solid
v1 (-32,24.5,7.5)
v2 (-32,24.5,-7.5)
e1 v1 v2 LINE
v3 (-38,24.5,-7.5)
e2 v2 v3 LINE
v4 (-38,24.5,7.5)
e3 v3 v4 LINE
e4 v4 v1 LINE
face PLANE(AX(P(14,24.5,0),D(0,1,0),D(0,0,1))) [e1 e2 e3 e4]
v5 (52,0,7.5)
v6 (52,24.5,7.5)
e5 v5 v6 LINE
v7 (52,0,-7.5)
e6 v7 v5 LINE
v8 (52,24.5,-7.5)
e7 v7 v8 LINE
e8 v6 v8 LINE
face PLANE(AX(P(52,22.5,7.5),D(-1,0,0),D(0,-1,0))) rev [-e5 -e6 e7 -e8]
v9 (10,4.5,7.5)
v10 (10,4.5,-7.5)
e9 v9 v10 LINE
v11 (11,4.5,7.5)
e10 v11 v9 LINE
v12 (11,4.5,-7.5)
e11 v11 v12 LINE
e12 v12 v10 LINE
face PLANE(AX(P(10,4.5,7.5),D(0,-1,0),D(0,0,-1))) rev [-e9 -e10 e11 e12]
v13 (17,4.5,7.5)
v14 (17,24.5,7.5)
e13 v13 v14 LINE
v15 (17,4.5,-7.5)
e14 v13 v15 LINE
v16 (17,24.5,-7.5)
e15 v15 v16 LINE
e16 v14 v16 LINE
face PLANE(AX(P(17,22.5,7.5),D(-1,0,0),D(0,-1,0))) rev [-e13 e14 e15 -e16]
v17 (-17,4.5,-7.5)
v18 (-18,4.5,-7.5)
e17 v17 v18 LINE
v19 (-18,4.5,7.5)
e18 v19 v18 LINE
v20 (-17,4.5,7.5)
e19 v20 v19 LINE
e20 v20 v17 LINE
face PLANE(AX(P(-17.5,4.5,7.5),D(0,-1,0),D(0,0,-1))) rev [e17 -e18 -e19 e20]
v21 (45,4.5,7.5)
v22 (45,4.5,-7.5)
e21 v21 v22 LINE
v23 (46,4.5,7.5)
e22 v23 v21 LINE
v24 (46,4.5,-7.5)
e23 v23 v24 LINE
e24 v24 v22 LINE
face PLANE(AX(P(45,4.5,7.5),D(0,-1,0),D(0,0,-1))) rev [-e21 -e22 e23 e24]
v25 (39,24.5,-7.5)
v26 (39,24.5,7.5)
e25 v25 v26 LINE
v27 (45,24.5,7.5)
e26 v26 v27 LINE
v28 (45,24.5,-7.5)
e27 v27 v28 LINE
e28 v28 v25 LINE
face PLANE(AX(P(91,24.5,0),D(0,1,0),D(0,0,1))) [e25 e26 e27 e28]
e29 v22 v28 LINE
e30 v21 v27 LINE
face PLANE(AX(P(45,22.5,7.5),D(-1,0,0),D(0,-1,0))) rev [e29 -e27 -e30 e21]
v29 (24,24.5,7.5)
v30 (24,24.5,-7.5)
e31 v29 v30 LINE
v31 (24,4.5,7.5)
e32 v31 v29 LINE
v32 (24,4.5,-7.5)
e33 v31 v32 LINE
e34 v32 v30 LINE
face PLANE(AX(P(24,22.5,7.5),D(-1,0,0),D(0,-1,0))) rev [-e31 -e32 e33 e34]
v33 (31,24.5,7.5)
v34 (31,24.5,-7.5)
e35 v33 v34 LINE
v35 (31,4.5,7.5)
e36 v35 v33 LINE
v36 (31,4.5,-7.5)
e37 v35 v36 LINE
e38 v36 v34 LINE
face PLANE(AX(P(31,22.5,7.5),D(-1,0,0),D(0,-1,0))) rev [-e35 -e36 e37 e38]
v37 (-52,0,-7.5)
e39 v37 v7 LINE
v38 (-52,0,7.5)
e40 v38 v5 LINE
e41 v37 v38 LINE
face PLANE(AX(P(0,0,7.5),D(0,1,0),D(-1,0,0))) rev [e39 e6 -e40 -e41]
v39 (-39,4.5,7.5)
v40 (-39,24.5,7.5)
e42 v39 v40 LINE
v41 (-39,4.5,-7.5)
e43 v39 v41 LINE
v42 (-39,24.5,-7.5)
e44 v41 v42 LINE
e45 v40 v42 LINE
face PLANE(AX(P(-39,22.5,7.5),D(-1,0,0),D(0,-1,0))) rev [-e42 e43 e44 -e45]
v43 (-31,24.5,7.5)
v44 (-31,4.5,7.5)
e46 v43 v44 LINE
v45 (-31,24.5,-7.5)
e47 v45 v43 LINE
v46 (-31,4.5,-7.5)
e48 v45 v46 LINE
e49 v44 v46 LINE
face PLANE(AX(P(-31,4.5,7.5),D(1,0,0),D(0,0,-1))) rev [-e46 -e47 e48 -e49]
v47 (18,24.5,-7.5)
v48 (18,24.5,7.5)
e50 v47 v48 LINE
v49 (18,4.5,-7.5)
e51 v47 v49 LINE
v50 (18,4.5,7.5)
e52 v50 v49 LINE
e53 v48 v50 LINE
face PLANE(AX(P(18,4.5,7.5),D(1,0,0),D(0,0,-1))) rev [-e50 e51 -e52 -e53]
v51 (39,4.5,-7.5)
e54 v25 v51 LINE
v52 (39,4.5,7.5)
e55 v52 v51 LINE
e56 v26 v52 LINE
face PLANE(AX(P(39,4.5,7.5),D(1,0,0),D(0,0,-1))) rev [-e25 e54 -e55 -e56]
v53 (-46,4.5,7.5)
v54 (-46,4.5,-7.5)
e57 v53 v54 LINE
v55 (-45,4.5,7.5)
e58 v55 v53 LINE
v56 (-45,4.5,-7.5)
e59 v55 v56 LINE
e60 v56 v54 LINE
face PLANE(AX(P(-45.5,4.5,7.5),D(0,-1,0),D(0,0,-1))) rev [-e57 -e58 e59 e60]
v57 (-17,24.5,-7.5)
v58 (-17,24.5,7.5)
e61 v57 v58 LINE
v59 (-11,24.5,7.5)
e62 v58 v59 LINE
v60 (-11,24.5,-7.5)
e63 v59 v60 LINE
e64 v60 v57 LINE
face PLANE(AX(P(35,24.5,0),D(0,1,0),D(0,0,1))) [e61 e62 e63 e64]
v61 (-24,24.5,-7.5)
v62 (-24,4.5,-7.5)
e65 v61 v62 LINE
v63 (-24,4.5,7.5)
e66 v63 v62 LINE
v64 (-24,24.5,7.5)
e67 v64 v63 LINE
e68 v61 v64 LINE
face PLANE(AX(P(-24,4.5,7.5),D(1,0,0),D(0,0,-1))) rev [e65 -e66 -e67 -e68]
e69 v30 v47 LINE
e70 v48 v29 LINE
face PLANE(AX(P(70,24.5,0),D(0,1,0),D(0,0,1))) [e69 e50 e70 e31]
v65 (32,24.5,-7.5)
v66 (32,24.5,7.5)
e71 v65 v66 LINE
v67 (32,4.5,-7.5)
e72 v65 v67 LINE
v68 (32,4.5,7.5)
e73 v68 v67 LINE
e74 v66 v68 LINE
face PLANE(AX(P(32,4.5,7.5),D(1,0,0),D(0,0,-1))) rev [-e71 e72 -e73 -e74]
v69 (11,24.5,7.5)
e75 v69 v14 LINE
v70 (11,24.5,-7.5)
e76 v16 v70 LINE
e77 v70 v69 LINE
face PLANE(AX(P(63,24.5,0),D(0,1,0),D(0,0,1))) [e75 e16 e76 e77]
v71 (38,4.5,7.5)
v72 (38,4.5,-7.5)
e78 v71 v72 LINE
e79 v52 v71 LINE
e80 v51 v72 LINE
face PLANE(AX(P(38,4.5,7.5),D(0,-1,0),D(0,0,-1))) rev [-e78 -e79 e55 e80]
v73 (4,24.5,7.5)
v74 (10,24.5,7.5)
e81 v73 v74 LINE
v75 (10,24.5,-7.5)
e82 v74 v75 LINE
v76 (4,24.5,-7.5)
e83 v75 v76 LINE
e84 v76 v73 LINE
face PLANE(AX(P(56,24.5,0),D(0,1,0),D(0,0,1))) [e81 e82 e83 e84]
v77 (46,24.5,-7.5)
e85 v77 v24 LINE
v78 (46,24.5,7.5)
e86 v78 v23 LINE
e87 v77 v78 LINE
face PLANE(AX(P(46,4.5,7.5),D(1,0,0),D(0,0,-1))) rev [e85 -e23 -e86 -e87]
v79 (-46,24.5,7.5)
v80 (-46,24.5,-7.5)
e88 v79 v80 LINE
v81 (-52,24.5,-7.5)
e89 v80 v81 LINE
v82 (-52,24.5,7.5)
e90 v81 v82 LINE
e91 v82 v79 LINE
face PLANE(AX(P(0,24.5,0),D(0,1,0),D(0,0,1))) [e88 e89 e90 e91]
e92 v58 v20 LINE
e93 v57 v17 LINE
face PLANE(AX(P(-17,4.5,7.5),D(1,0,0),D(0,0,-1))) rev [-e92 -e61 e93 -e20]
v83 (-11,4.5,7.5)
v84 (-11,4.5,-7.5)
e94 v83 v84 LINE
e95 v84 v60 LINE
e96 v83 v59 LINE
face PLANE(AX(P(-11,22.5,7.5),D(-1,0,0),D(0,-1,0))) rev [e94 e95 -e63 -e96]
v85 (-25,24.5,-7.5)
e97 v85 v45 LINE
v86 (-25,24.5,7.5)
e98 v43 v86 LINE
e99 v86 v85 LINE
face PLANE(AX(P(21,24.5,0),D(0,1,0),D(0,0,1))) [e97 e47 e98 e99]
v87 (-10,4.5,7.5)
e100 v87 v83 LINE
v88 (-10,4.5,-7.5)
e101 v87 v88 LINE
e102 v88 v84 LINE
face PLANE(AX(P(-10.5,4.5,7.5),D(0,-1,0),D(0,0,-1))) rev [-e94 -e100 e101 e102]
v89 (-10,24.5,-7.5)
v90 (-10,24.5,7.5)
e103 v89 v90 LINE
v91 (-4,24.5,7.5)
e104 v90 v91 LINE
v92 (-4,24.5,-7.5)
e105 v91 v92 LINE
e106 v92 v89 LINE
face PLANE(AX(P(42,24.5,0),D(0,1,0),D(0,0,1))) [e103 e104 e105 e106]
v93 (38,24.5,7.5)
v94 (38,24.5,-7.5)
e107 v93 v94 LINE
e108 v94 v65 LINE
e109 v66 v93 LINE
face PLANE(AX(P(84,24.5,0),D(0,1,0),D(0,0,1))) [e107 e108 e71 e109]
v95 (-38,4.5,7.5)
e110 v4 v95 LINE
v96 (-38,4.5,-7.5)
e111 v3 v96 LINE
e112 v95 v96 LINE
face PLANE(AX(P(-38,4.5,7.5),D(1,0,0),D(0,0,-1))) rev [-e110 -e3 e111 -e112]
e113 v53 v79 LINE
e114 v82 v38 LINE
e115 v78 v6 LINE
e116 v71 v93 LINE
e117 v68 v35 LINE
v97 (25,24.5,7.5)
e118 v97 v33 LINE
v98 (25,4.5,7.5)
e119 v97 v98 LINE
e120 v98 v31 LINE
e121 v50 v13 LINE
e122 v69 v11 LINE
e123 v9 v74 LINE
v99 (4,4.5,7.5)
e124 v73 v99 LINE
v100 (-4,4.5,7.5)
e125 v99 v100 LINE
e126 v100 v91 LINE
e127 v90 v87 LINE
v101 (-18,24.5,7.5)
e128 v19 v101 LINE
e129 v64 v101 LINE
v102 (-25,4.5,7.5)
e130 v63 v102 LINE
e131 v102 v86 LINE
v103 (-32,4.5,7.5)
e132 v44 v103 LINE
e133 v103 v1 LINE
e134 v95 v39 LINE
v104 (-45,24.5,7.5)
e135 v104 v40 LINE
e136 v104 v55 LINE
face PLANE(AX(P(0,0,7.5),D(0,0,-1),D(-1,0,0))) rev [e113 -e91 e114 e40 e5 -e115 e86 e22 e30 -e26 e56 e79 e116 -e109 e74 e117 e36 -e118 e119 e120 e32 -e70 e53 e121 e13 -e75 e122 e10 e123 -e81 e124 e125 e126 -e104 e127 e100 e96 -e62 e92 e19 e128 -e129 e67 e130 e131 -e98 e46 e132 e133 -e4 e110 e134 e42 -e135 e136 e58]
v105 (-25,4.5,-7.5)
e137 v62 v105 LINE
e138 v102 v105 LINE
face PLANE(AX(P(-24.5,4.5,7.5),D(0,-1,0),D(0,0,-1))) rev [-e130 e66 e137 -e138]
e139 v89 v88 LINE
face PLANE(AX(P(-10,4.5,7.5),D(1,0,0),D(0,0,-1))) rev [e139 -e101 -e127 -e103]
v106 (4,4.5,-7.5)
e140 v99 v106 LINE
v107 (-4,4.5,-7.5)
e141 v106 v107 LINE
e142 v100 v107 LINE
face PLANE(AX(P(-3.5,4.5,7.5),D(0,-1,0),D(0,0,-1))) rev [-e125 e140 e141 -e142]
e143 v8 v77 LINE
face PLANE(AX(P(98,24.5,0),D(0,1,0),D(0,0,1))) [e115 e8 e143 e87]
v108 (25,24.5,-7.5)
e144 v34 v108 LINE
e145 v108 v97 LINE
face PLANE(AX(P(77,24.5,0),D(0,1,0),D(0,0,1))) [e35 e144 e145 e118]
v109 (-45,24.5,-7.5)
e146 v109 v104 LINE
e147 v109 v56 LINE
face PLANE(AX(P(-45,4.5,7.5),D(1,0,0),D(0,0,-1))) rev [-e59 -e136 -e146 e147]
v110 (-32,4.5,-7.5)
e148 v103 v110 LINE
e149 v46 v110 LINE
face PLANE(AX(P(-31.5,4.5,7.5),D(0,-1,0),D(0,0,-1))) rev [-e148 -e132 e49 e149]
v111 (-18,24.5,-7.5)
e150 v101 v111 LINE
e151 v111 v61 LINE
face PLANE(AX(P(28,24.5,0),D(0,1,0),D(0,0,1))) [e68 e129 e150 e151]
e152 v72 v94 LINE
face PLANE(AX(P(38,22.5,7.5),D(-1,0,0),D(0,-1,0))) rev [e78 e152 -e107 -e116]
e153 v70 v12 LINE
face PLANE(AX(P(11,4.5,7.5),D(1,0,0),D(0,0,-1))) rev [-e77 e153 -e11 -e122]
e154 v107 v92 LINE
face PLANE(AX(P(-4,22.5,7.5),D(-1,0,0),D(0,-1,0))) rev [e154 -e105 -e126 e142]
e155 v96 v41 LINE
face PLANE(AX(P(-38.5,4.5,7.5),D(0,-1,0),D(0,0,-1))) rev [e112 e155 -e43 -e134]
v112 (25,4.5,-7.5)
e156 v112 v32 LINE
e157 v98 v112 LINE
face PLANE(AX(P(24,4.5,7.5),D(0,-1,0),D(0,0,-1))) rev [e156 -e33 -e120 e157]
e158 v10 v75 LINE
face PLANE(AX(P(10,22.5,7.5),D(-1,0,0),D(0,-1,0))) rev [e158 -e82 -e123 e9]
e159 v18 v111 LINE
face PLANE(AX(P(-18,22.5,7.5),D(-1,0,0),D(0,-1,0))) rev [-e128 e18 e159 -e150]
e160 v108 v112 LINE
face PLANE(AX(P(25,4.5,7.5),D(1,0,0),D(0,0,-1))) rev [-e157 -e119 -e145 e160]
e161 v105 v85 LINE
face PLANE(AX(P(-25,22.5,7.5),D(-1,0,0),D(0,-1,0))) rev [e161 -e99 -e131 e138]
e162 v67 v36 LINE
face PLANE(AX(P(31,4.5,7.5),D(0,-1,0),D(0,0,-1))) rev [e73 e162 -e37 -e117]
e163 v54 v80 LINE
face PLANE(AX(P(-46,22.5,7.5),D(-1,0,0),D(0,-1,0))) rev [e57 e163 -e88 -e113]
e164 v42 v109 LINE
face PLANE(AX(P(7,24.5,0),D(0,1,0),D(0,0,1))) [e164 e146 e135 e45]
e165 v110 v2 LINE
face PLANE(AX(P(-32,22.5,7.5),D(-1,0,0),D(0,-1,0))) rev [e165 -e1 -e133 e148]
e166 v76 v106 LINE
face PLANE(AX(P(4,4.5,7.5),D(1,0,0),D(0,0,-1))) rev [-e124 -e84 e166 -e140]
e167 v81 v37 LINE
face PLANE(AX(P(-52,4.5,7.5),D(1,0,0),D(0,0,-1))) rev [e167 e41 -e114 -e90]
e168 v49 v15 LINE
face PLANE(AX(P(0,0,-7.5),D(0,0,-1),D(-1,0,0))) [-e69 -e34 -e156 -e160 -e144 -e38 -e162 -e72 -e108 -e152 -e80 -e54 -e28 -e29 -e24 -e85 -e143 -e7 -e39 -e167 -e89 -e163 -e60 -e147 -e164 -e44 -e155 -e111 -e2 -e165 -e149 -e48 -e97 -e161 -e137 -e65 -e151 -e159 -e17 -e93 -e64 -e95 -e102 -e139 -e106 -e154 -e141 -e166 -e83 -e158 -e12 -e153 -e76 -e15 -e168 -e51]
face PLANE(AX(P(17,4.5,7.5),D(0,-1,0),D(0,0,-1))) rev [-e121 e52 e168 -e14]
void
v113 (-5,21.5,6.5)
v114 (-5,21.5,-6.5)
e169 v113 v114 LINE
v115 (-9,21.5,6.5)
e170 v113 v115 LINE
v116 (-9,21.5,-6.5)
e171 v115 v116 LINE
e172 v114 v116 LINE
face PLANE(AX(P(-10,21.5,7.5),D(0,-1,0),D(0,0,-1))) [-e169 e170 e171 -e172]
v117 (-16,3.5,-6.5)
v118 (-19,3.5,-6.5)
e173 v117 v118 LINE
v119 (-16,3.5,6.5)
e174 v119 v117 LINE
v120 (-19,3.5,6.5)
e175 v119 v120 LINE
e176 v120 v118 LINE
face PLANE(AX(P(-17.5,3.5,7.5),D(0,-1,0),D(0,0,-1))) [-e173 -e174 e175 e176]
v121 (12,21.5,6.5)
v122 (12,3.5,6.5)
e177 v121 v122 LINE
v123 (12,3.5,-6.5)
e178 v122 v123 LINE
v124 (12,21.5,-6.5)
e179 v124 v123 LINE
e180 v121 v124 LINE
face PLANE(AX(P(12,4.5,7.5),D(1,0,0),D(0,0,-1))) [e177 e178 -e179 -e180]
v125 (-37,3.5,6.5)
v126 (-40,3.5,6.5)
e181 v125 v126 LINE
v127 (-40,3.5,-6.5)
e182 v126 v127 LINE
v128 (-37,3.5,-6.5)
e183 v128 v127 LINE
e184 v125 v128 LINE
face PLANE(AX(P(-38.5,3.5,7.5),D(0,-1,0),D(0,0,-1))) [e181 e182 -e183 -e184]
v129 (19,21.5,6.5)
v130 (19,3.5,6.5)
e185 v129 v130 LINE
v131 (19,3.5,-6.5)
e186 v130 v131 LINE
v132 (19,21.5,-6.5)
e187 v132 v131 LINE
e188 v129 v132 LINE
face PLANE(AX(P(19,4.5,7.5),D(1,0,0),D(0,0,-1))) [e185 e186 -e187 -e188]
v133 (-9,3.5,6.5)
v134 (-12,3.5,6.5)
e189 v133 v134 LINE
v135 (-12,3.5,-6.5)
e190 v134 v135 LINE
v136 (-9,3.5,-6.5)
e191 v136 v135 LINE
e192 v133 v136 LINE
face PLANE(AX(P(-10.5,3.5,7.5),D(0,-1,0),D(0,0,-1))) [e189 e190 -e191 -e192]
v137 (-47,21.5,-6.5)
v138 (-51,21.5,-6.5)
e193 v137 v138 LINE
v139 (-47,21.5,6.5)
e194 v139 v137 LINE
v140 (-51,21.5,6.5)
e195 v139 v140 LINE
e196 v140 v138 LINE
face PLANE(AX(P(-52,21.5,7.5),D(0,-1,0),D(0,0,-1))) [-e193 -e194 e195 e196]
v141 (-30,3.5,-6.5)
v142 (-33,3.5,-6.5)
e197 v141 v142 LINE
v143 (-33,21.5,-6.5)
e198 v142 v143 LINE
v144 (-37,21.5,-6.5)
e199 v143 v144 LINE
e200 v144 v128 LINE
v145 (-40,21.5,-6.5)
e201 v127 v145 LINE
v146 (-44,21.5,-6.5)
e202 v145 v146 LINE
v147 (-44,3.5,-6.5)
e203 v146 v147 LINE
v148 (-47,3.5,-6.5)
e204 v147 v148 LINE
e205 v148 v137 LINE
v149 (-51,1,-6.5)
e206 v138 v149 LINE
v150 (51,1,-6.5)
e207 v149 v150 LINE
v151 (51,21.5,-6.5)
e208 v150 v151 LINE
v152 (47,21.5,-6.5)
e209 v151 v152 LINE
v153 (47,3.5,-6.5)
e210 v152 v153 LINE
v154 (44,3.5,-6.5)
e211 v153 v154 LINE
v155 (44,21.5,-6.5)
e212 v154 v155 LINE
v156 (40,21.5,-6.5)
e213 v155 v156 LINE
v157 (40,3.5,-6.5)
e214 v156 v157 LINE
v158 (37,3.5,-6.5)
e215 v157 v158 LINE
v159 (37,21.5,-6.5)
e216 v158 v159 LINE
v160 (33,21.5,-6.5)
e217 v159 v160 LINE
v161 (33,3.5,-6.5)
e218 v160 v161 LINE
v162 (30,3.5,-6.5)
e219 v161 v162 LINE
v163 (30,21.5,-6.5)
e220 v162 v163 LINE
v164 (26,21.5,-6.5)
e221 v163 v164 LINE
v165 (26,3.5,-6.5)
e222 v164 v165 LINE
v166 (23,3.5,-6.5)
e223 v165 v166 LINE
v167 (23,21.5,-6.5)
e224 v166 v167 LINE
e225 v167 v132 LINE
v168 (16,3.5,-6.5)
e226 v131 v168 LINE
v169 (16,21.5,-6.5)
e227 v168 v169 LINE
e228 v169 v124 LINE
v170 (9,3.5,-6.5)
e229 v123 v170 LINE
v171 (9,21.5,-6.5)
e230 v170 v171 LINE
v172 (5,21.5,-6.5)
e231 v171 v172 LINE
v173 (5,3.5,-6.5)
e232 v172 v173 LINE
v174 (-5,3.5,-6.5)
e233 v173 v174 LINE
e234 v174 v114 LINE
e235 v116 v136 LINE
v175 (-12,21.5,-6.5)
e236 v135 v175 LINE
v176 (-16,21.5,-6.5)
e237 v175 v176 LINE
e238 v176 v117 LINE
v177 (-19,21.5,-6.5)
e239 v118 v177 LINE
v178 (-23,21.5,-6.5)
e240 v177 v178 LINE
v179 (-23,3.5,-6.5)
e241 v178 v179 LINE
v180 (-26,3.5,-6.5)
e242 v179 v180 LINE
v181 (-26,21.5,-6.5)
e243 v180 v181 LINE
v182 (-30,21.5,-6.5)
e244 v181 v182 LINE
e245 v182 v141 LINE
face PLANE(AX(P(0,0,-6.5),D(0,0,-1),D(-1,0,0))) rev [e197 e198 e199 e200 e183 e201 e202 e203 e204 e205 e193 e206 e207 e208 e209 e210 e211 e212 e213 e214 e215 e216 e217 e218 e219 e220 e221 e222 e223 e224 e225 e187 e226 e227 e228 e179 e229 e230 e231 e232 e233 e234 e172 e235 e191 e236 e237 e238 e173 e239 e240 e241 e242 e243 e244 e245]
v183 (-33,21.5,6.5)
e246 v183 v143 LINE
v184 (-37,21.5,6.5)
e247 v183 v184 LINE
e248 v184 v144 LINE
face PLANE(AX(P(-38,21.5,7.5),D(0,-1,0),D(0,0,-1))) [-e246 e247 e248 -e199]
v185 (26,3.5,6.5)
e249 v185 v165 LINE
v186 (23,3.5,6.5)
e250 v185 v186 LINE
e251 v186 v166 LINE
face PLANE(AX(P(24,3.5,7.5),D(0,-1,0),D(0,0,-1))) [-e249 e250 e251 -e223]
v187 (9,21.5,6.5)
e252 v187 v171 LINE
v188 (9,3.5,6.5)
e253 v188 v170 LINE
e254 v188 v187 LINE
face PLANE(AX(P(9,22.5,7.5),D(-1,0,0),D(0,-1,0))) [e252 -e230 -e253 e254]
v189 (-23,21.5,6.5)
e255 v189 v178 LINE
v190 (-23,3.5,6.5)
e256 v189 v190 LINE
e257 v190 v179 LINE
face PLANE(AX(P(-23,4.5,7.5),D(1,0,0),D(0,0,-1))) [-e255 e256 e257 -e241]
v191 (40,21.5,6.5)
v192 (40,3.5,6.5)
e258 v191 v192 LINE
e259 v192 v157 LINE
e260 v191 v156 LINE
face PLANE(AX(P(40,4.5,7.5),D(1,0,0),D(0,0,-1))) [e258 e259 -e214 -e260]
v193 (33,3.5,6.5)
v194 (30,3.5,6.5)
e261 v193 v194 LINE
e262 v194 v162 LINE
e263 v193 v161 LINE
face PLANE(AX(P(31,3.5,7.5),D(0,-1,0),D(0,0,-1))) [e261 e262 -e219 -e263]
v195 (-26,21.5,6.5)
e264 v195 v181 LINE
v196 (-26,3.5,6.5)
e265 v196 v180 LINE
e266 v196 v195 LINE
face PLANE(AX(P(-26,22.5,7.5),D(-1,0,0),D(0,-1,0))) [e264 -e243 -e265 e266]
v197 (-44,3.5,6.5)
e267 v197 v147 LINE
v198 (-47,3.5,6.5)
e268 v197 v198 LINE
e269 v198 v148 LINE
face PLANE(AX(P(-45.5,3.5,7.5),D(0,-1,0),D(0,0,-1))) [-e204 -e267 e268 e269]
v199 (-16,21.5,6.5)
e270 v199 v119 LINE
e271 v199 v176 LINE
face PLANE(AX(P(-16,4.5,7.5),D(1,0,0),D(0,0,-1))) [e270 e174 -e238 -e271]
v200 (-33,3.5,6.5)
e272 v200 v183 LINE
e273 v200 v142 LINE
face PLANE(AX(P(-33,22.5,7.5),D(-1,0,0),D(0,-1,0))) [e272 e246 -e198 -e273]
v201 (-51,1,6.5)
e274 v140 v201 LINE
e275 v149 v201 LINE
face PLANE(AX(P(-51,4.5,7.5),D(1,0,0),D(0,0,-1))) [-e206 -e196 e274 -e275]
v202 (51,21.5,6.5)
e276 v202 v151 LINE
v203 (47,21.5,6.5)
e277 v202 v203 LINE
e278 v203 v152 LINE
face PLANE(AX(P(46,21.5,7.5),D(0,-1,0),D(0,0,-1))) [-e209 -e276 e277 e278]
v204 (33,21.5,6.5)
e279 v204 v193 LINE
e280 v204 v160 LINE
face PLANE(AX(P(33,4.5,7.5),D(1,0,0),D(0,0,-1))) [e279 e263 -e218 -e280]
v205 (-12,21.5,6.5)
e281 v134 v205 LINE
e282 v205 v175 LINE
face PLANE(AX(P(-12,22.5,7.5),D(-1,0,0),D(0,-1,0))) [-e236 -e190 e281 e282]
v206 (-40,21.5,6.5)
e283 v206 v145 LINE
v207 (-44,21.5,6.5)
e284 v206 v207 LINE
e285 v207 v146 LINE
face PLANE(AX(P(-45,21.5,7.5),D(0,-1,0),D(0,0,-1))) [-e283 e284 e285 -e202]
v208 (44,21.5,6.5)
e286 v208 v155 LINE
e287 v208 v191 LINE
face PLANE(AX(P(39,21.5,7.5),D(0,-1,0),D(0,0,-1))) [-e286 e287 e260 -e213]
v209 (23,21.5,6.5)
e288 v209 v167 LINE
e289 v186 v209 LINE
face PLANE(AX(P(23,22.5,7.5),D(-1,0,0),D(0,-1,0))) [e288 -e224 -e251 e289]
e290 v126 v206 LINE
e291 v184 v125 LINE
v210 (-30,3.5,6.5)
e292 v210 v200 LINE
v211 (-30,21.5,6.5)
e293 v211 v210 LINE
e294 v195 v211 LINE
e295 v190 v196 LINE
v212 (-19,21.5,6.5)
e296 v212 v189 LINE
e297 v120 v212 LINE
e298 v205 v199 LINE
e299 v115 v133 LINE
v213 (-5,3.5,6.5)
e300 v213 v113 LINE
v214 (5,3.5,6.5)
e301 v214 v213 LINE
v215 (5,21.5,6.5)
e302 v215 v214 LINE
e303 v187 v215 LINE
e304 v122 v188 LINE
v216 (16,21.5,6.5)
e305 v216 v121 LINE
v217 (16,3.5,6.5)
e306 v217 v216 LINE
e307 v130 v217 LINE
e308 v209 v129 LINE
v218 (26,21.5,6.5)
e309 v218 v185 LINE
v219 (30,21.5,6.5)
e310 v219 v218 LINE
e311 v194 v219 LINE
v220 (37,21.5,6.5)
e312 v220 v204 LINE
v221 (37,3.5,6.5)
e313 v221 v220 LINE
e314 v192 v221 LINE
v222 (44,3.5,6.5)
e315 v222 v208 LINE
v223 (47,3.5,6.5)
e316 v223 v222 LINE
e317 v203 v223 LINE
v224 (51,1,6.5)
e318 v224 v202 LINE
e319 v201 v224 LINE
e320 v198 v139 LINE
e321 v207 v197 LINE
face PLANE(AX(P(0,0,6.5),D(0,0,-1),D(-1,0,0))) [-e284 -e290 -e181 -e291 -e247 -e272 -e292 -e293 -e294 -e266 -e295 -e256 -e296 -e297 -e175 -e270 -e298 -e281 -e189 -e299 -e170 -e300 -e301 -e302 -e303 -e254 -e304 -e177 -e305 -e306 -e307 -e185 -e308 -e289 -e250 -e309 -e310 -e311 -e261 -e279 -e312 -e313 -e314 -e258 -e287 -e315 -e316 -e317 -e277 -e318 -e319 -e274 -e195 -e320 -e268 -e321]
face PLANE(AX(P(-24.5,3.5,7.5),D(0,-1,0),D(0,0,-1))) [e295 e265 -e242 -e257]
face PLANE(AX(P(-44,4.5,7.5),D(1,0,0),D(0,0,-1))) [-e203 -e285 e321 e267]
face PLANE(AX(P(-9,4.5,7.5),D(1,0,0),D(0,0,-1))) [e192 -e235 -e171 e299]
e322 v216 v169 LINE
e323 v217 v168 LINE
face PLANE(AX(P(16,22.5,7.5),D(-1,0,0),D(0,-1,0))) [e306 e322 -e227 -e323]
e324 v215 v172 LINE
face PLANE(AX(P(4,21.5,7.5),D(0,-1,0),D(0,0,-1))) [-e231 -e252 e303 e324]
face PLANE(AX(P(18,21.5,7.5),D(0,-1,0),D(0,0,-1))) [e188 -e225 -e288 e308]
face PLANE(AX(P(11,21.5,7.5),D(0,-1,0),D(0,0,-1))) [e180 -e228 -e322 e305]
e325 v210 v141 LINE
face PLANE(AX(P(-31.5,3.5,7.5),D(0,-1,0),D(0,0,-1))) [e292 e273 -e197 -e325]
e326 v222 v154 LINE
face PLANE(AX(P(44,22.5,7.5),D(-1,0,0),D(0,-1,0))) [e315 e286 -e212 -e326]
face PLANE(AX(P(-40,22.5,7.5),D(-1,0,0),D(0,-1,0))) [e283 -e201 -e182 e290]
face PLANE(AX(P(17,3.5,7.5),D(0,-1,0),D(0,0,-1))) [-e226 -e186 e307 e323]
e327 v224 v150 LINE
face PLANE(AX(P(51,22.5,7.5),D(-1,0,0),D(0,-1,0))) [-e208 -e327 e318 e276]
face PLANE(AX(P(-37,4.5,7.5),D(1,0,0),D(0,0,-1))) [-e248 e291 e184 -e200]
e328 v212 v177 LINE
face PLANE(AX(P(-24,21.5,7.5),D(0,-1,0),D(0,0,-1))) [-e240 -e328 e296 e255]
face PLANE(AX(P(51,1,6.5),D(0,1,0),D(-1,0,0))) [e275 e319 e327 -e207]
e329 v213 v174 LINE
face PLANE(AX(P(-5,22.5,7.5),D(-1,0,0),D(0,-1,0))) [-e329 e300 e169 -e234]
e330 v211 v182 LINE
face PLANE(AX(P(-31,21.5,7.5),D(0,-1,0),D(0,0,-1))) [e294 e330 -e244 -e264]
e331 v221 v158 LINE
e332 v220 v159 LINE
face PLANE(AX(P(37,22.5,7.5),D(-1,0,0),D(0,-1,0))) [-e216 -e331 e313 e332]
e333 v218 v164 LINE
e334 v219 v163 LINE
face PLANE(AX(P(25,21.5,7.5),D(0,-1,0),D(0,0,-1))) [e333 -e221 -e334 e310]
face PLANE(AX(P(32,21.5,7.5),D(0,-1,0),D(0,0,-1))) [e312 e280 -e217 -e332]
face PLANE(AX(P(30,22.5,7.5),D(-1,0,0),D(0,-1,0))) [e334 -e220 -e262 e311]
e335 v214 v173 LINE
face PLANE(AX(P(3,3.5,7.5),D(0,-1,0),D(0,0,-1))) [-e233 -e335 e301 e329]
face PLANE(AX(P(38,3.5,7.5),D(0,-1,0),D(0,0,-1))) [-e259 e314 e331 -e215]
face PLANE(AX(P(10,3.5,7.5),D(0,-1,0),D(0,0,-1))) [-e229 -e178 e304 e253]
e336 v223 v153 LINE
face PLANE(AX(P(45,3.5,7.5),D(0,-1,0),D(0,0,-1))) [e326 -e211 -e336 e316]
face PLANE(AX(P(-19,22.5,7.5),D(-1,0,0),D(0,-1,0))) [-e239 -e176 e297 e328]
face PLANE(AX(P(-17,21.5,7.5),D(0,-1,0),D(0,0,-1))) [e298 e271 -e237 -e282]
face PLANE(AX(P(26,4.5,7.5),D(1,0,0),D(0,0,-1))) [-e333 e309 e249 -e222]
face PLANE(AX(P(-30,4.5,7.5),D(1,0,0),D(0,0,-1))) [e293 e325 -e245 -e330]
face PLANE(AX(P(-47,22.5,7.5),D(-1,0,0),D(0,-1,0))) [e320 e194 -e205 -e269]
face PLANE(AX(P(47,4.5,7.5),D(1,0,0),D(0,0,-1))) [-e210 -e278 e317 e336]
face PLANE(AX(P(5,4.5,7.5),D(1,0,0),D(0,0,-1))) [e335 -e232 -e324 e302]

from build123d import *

# Parameters (mm, degrees)
BOSS_EXTRUDE1_DEPTH     = 7.5
LPATTERN1_COUNT         = 8
LPATTERN1_PITCH         = 7
LPATTERN1_COL_COUNT     = 8
LPATTERN1_COL_PITCH     = 7
SHELL2_T                = -1
CUT_EXTRUDE2_DEPTH      = 15
CUT_EXTRUDE2_DEPTH_BACK = 58.608593109
SKETCH3_W               = 0.5
SKETCH3_H               = 4.5
SKETCH4_W               = 13
SKETCH4_H               = 2.5
BOSS_EXTRUDE2_DEPTH     = 1
SKETCH5_W               = 13
SKETCH5_H               = 2.5
BOSS_EXTRUDE3_DEPTH     = 1
SKETCH8_W               = 6
SKETCH8_H               = 15
BOSS_EXTRUDE5_DEPTH     = 2
LPATTERN2_COUNT         = 15
LPATTERN2_PITCH         = 7
SKETCH10_W              = 6
SKETCH10_H              = 15
CUT_EXTRUDE4_DEPTH      = 20
SKETCH11_W              = 13
SKETCH11_H              = 1
BOSS_EXTRUDE6_DEPTH     = 4


# Read off the part's stored shape, not the designer's step: Split1
with BuildPart() as part:
    # Sketch1 → Boss-Extrude1 (new, symmetric)
    with BuildSketch(Plane.XY):
        Polygon((0, 0), (-3.5, 0), (-3.5, 4.5), (-3, 4.5), (-3, 22.5), (3, 22.5), (3, 4.5), (3.5, 4.5), (3.5, 0), align=None)
    boss_extrude1 = extrude(amount=BOSS_EXTRUDE1_DEPTH, both=True)

    # LPattern1: Boss-Extrude1 ×8
    with Locations(*[(-i * LPATTERN1_PITCH, 0, 0) for i in range(1, LPATTERN1_COUNT)]):
        add(boss_extrude1)


with BuildPart() as lpattern1_col_1:
    # LPattern1 col: pattern copy
    add(boss_extrude1.moved(Location(Vector(1, 0, 0) * (1 * LPATTERN1_COL_PITCH))))


with BuildPart() as lpattern1_col_2:
    # LPattern1 col: pattern copy
    add(boss_extrude1.moved(Location(Vector(1, 0, 0) * (2 * LPATTERN1_COL_PITCH))))


with BuildPart() as lpattern1_col_3:
    # LPattern1 col: pattern copy
    add(boss_extrude1.moved(Location(Vector(1, 0, 0) * (3 * LPATTERN1_COL_PITCH))))


with BuildPart() as lpattern1_col_4:
    # LPattern1 col: pattern copy
    add(boss_extrude1.moved(Location(Vector(1, 0, 0) * (4 * LPATTERN1_COL_PITCH))))


with BuildPart() as lpattern1_col_5:
    # LPattern1 col: pattern copy
    add(boss_extrude1.moved(Location(Vector(1, 0, 0) * (5 * LPATTERN1_COL_PITCH))))


with BuildPart() as lpattern1_col_6:
    # LPattern1 col: pattern copy
    add(boss_extrude1.moved(Location(Vector(1, 0, 0) * (6 * LPATTERN1_COL_PITCH))))


with BuildPart() as lpattern1_col_7:
    # LPattern1 col: pattern copy
    add(boss_extrude1.moved(Location(Vector(1, 0, 0) * (7 * LPATTERN1_COL_PITCH))))


with BuildPart() as part_1:
    add(part.part)

    # LPattern1 col united with what the copie: union LPattern1 col_1, LPattern1 col_2, LPattern1 col_3, LPattern1 col_4, LPattern1 col_5, LPattern1 col_6, LPattern1 col_7
    add(lpattern1_col_1.part)
    add(lpattern1_col_2.part)
    add(lpattern1_col_3.part)
    add(lpattern1_col_4.part)
    add(lpattern1_col_5.part)
    add(lpattern1_col_6.part)
    add(lpattern1_col_7.part)

    # Shell2
    shell2_openings = [part_1.faces().sort_by_distance(p)[0] for p in [
        (52.5, 2.25, 0),
        (-52.5, 2.25, 0),
    ]]
    offset(amount=SHELL2_T, openings=shell2_openings, kind=Kind.INTERSECTION)

    # Sketch3 → Cut-Extrude2 (cut, two sides: drawn at the far end of the back side and taken through both)
    with BuildSketch(Plane.XY.offset(-CUT_EXTRUDE2_DEPTH_BACK)):
        with Locations((-52.25, 2.25)):
            Rectangle(SKETCH3_W, SKETCH3_H)
        with Locations((52.25, 2.25)):
            Rectangle(SKETCH3_W, SKETCH3_H)
    extrude(amount=CUT_EXTRUDE2_DEPTH + CUT_EXTRUDE2_DEPTH_BACK, mode=Mode.SUBTRACT)

    # Sketch4 → Boss-Extrude2 (add)
    with BuildSketch(Plane.ZY.offset(52)):
        with Locations((0, 2.25)):
            Rectangle(SKETCH4_W, SKETCH4_H)
    extrude(amount=-BOSS_EXTRUDE2_DEPTH)

    # Sketch5 → Boss-Extrude3 (add)
    with BuildSketch(Plane(origin=(52, 0, 0), x_dir=(0, 0, -1), z_dir=(1, 0, 0))):
        with Locations((0, 2.25)):
            Rectangle(SKETCH5_W, SKETCH5_H)
    extrude(amount=-BOSS_EXTRUDE3_DEPTH)

    # Sketch8 → Boss-Extrude5 (add)
    with BuildSketch(Plane(origin=(0, 22.5, 0), x_dir=(1, 0, 0), z_dir=(0, 1, 0))):
        with Locations((-49, 0)):
            Rectangle(SKETCH8_W, SKETCH8_H)
    boss_extrude5 = extrude(amount=BOSS_EXTRUDE5_DEPTH)

    # LPattern2: Boss-Extrude5 ×15
    with Locations(*[(i * LPATTERN2_PITCH, 0, 0) for i in range(1, LPATTERN2_COUNT)]):
        add(boss_extrude5)


with BuildPart() as body_2:
    # Split1: the piece on the far side of the plane
    add(part_1.part)
    split(bisect_by=Plane(origin=(0, 1, 0), x_dir=(1, 0, 0), z_dir=(0, 1, 0)), keep=Keep.BOTTOM)


with BuildPart() as part_2:
    add(part_1.part)

    # Split1
    split(bisect_by=Plane(origin=(0, 1, 0), x_dir=(1, 0, 0), z_dir=(0, 1, 0)), keep=Keep.TOP)

    # Sketch10 → Cut-Extrude4 (cut)
    with BuildSketch(Plane(origin=(0, 24.5, 0), x_dir=(1, 0, 0), z_dir=(0, 1, 0))):
        Rectangle(SKETCH10_W, SKETCH10_H)
    extrude(amount=-CUT_EXTRUDE4_DEPTH, mode=Mode.SUBTRACT)

    # Sketch11 → Boss-Extrude6 (add)
    with BuildSketch(Plane(origin=(-2, 0, 0), x_dir=(0, 0, -1), z_dir=(1, 0, 0))):
        with Locations((0, 4)):
            Rectangle(SKETCH11_W, SKETCH11_H)
    extrude(amount=BOSS_EXTRUDE6_DEPTH)


with BuildPart() as body_2_1:
    add(body_2.part)

    # Combine1: union part
    add(part_2.part)


solid = body_2_1.part
